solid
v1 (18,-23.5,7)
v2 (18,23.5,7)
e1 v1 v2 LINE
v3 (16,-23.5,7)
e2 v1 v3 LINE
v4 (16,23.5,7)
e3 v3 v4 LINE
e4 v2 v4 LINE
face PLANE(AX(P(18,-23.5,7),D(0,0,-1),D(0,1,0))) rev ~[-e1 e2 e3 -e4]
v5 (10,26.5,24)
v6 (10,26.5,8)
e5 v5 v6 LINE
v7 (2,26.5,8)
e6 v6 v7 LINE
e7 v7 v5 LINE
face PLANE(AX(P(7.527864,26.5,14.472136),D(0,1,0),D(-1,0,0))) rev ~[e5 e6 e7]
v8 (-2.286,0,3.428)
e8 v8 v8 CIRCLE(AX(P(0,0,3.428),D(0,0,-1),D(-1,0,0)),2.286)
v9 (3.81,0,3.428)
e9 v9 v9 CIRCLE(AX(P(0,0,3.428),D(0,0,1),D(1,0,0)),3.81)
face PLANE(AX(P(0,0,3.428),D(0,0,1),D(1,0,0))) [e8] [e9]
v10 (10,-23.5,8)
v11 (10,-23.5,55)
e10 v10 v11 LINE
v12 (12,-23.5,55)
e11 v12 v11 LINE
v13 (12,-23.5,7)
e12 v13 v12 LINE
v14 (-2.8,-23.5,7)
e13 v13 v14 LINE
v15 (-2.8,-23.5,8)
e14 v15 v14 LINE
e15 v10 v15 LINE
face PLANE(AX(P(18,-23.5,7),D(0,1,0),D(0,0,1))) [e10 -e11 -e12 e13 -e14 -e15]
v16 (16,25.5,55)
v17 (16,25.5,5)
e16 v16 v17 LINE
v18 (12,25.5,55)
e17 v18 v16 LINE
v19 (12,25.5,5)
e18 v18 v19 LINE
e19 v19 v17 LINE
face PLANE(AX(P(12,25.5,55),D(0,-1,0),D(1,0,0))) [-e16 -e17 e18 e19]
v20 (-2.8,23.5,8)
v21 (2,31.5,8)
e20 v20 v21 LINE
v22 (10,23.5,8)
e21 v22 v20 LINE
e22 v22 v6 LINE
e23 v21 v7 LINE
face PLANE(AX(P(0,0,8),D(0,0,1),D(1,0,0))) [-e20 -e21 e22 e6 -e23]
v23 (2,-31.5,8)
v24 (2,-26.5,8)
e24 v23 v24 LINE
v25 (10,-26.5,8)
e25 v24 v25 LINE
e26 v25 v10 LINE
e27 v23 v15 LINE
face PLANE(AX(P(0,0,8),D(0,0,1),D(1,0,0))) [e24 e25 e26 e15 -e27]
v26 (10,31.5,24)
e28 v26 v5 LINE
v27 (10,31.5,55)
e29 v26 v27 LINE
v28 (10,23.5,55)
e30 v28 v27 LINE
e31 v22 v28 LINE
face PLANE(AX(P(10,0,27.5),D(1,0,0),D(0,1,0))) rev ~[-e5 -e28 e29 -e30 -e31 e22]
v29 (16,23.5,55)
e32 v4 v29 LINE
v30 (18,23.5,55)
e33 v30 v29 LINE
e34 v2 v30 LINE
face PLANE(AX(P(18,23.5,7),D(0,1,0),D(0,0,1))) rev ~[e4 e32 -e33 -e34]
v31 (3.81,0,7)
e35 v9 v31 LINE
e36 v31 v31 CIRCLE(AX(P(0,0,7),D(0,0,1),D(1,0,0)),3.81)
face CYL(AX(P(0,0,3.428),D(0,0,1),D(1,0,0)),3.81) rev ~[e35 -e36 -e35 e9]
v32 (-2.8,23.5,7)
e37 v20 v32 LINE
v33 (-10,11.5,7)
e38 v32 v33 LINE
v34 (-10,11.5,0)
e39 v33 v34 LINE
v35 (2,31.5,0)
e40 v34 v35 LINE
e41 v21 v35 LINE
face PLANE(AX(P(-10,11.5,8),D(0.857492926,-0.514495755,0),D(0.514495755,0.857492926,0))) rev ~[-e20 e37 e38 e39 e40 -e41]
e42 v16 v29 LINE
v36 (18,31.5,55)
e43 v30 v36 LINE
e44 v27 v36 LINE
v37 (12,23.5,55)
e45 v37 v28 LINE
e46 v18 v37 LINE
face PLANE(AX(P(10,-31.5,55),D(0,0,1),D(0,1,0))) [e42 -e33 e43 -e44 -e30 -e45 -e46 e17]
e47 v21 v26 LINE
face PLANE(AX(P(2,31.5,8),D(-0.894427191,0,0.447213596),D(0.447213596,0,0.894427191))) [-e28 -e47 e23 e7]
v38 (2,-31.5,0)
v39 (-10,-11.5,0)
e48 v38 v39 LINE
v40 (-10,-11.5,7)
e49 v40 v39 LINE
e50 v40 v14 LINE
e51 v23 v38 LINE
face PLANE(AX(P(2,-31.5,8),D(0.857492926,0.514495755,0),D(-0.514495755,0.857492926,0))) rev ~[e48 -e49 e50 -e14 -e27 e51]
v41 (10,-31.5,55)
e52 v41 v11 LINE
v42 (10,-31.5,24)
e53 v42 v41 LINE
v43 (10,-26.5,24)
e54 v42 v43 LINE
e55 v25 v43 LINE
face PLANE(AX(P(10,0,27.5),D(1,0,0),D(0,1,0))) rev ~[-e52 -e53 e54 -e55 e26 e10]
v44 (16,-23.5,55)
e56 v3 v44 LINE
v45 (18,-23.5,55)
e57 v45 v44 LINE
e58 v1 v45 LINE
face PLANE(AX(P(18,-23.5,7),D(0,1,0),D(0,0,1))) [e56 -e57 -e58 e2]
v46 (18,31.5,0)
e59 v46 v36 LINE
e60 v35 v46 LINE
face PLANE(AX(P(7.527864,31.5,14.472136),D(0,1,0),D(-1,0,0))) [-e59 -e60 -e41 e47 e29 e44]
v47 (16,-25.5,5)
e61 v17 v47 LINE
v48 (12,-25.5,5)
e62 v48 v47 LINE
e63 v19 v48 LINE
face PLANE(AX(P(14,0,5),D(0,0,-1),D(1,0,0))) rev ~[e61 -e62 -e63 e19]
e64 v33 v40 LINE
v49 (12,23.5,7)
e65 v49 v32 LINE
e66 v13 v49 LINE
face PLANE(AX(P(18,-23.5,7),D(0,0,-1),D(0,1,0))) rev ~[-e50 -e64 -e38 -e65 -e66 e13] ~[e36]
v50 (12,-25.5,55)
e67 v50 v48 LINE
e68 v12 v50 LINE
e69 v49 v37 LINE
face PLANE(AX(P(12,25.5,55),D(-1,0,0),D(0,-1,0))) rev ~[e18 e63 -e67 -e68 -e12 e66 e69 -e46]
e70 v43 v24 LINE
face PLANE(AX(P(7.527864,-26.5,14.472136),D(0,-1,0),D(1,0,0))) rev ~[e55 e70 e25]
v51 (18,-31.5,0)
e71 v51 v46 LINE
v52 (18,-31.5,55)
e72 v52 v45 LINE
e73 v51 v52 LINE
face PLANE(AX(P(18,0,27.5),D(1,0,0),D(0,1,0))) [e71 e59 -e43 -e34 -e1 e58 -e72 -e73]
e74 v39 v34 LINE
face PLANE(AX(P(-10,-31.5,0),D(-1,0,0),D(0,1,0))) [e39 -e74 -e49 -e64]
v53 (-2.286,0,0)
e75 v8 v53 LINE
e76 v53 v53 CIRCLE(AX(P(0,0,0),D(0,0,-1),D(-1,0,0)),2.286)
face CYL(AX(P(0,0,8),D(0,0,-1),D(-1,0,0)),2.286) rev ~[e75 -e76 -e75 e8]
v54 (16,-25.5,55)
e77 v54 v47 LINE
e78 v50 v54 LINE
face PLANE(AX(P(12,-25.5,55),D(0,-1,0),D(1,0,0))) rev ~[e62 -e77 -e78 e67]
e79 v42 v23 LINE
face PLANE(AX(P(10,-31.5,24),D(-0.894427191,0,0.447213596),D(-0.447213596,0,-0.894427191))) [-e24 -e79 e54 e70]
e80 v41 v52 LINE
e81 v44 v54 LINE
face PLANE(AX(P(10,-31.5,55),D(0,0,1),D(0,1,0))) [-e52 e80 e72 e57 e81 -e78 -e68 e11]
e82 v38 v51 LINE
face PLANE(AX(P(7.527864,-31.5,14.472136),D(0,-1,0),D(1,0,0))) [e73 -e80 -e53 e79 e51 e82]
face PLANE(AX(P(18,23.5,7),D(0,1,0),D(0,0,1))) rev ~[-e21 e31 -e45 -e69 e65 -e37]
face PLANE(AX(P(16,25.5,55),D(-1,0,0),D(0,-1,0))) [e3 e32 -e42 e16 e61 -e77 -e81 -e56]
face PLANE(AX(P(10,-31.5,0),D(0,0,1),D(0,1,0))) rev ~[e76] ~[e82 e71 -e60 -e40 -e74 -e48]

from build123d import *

# Parameters (mm, degrees)
F0_W           = 20
F0_H           = 63
F1_DEPTH       = 8
F2_W           = 63
F2_H           = 55
F3_DEPTH       = 8
F5_D           = 4.572
F5_CBORE_D     = 7.62
F5_CBORE_DEPTH = 4.572
F6_W           = 47
F6_H           = 48
F7_DEPTH       = 28.001
F9_W           = 4
F9_H           = 51
F10_DEPTH      = 50
F12_DEPTH      = 5
F14_DEPTH      = 5
F16_DEPTH      = 25


# Not quite as in the source:
# - a feature names something its author has since deleted; it is built from what else it names


with BuildPart() as f1:
    # F0 (on Top) → F1 (new body)
    with BuildSketch(Plane.XY):
        Rectangle(F0_W, F0_H)
    extrude(amount=F1_DEPTH)

    # F2 (on face) → F3 (join)
    with BuildSketch(Plane.YZ.offset(10)):
        with Locations((0, 27.5)):
            Rectangle(F2_W, F2_H)
    extrude(amount=F3_DEPTH)

    # F5 (through all)
    with Locations(Plane.XY.offset(8)):
        with Locations((0, 0)):
            CounterBoreHole(F5_D / 2, F5_CBORE_D / 2, F5_CBORE_DEPTH)

    # F6 (on face) → F7 (cut, through all)
    with BuildSketch(Plane.YZ.offset(18)):
        with Locations((0, 31)):
            Rectangle(F6_W, F6_H)
    extrude(amount=-F7_DEPTH, mode=Mode.SUBTRACT)

    # F9 (on 3pt) → F10 (cut)
    with BuildSketch(Plane(origin=(0, 0, 55), x_dir=(1, 0, 0), z_dir=(0, 0, -1))):
        with Locations((14, 0)):
            Rectangle(F9_W, F9_H)
    extrude(amount=F10_DEPTH, mode=Mode.SUBTRACT)

    # F11 (on face) → F12 (join)
    with BuildSketch(Plane.XZ.offset(31.5)):
        Polygon((2, 8), (10, 8), (10, 24), align=None)
    extrude(amount=-F12_DEPTH)

    # F13 (on face) → F14 (join)
    with BuildSketch(Plane(origin=(0, 31.5, 0), x_dir=(-1, 0, 0), z_dir=(0, 1, 0))):
        Polygon((-10, 24), (-10, 8), (-2, 8), align=None)
    extrude(amount=-F14_DEPTH)

    # F15 (on face) → F16 (cut)
    with BuildSketch(Plane.XY.offset(8)):
        Polygon((-10, 11.5), (2, 31.5), (-10, 31.5), align=None)
        Polygon((-10, -11.5), (-10, -31.5), (2, -31.5), align=None)
    extrude(amount=-F16_DEPTH, mode=Mode.SUBTRACT)


solid = f1.part
